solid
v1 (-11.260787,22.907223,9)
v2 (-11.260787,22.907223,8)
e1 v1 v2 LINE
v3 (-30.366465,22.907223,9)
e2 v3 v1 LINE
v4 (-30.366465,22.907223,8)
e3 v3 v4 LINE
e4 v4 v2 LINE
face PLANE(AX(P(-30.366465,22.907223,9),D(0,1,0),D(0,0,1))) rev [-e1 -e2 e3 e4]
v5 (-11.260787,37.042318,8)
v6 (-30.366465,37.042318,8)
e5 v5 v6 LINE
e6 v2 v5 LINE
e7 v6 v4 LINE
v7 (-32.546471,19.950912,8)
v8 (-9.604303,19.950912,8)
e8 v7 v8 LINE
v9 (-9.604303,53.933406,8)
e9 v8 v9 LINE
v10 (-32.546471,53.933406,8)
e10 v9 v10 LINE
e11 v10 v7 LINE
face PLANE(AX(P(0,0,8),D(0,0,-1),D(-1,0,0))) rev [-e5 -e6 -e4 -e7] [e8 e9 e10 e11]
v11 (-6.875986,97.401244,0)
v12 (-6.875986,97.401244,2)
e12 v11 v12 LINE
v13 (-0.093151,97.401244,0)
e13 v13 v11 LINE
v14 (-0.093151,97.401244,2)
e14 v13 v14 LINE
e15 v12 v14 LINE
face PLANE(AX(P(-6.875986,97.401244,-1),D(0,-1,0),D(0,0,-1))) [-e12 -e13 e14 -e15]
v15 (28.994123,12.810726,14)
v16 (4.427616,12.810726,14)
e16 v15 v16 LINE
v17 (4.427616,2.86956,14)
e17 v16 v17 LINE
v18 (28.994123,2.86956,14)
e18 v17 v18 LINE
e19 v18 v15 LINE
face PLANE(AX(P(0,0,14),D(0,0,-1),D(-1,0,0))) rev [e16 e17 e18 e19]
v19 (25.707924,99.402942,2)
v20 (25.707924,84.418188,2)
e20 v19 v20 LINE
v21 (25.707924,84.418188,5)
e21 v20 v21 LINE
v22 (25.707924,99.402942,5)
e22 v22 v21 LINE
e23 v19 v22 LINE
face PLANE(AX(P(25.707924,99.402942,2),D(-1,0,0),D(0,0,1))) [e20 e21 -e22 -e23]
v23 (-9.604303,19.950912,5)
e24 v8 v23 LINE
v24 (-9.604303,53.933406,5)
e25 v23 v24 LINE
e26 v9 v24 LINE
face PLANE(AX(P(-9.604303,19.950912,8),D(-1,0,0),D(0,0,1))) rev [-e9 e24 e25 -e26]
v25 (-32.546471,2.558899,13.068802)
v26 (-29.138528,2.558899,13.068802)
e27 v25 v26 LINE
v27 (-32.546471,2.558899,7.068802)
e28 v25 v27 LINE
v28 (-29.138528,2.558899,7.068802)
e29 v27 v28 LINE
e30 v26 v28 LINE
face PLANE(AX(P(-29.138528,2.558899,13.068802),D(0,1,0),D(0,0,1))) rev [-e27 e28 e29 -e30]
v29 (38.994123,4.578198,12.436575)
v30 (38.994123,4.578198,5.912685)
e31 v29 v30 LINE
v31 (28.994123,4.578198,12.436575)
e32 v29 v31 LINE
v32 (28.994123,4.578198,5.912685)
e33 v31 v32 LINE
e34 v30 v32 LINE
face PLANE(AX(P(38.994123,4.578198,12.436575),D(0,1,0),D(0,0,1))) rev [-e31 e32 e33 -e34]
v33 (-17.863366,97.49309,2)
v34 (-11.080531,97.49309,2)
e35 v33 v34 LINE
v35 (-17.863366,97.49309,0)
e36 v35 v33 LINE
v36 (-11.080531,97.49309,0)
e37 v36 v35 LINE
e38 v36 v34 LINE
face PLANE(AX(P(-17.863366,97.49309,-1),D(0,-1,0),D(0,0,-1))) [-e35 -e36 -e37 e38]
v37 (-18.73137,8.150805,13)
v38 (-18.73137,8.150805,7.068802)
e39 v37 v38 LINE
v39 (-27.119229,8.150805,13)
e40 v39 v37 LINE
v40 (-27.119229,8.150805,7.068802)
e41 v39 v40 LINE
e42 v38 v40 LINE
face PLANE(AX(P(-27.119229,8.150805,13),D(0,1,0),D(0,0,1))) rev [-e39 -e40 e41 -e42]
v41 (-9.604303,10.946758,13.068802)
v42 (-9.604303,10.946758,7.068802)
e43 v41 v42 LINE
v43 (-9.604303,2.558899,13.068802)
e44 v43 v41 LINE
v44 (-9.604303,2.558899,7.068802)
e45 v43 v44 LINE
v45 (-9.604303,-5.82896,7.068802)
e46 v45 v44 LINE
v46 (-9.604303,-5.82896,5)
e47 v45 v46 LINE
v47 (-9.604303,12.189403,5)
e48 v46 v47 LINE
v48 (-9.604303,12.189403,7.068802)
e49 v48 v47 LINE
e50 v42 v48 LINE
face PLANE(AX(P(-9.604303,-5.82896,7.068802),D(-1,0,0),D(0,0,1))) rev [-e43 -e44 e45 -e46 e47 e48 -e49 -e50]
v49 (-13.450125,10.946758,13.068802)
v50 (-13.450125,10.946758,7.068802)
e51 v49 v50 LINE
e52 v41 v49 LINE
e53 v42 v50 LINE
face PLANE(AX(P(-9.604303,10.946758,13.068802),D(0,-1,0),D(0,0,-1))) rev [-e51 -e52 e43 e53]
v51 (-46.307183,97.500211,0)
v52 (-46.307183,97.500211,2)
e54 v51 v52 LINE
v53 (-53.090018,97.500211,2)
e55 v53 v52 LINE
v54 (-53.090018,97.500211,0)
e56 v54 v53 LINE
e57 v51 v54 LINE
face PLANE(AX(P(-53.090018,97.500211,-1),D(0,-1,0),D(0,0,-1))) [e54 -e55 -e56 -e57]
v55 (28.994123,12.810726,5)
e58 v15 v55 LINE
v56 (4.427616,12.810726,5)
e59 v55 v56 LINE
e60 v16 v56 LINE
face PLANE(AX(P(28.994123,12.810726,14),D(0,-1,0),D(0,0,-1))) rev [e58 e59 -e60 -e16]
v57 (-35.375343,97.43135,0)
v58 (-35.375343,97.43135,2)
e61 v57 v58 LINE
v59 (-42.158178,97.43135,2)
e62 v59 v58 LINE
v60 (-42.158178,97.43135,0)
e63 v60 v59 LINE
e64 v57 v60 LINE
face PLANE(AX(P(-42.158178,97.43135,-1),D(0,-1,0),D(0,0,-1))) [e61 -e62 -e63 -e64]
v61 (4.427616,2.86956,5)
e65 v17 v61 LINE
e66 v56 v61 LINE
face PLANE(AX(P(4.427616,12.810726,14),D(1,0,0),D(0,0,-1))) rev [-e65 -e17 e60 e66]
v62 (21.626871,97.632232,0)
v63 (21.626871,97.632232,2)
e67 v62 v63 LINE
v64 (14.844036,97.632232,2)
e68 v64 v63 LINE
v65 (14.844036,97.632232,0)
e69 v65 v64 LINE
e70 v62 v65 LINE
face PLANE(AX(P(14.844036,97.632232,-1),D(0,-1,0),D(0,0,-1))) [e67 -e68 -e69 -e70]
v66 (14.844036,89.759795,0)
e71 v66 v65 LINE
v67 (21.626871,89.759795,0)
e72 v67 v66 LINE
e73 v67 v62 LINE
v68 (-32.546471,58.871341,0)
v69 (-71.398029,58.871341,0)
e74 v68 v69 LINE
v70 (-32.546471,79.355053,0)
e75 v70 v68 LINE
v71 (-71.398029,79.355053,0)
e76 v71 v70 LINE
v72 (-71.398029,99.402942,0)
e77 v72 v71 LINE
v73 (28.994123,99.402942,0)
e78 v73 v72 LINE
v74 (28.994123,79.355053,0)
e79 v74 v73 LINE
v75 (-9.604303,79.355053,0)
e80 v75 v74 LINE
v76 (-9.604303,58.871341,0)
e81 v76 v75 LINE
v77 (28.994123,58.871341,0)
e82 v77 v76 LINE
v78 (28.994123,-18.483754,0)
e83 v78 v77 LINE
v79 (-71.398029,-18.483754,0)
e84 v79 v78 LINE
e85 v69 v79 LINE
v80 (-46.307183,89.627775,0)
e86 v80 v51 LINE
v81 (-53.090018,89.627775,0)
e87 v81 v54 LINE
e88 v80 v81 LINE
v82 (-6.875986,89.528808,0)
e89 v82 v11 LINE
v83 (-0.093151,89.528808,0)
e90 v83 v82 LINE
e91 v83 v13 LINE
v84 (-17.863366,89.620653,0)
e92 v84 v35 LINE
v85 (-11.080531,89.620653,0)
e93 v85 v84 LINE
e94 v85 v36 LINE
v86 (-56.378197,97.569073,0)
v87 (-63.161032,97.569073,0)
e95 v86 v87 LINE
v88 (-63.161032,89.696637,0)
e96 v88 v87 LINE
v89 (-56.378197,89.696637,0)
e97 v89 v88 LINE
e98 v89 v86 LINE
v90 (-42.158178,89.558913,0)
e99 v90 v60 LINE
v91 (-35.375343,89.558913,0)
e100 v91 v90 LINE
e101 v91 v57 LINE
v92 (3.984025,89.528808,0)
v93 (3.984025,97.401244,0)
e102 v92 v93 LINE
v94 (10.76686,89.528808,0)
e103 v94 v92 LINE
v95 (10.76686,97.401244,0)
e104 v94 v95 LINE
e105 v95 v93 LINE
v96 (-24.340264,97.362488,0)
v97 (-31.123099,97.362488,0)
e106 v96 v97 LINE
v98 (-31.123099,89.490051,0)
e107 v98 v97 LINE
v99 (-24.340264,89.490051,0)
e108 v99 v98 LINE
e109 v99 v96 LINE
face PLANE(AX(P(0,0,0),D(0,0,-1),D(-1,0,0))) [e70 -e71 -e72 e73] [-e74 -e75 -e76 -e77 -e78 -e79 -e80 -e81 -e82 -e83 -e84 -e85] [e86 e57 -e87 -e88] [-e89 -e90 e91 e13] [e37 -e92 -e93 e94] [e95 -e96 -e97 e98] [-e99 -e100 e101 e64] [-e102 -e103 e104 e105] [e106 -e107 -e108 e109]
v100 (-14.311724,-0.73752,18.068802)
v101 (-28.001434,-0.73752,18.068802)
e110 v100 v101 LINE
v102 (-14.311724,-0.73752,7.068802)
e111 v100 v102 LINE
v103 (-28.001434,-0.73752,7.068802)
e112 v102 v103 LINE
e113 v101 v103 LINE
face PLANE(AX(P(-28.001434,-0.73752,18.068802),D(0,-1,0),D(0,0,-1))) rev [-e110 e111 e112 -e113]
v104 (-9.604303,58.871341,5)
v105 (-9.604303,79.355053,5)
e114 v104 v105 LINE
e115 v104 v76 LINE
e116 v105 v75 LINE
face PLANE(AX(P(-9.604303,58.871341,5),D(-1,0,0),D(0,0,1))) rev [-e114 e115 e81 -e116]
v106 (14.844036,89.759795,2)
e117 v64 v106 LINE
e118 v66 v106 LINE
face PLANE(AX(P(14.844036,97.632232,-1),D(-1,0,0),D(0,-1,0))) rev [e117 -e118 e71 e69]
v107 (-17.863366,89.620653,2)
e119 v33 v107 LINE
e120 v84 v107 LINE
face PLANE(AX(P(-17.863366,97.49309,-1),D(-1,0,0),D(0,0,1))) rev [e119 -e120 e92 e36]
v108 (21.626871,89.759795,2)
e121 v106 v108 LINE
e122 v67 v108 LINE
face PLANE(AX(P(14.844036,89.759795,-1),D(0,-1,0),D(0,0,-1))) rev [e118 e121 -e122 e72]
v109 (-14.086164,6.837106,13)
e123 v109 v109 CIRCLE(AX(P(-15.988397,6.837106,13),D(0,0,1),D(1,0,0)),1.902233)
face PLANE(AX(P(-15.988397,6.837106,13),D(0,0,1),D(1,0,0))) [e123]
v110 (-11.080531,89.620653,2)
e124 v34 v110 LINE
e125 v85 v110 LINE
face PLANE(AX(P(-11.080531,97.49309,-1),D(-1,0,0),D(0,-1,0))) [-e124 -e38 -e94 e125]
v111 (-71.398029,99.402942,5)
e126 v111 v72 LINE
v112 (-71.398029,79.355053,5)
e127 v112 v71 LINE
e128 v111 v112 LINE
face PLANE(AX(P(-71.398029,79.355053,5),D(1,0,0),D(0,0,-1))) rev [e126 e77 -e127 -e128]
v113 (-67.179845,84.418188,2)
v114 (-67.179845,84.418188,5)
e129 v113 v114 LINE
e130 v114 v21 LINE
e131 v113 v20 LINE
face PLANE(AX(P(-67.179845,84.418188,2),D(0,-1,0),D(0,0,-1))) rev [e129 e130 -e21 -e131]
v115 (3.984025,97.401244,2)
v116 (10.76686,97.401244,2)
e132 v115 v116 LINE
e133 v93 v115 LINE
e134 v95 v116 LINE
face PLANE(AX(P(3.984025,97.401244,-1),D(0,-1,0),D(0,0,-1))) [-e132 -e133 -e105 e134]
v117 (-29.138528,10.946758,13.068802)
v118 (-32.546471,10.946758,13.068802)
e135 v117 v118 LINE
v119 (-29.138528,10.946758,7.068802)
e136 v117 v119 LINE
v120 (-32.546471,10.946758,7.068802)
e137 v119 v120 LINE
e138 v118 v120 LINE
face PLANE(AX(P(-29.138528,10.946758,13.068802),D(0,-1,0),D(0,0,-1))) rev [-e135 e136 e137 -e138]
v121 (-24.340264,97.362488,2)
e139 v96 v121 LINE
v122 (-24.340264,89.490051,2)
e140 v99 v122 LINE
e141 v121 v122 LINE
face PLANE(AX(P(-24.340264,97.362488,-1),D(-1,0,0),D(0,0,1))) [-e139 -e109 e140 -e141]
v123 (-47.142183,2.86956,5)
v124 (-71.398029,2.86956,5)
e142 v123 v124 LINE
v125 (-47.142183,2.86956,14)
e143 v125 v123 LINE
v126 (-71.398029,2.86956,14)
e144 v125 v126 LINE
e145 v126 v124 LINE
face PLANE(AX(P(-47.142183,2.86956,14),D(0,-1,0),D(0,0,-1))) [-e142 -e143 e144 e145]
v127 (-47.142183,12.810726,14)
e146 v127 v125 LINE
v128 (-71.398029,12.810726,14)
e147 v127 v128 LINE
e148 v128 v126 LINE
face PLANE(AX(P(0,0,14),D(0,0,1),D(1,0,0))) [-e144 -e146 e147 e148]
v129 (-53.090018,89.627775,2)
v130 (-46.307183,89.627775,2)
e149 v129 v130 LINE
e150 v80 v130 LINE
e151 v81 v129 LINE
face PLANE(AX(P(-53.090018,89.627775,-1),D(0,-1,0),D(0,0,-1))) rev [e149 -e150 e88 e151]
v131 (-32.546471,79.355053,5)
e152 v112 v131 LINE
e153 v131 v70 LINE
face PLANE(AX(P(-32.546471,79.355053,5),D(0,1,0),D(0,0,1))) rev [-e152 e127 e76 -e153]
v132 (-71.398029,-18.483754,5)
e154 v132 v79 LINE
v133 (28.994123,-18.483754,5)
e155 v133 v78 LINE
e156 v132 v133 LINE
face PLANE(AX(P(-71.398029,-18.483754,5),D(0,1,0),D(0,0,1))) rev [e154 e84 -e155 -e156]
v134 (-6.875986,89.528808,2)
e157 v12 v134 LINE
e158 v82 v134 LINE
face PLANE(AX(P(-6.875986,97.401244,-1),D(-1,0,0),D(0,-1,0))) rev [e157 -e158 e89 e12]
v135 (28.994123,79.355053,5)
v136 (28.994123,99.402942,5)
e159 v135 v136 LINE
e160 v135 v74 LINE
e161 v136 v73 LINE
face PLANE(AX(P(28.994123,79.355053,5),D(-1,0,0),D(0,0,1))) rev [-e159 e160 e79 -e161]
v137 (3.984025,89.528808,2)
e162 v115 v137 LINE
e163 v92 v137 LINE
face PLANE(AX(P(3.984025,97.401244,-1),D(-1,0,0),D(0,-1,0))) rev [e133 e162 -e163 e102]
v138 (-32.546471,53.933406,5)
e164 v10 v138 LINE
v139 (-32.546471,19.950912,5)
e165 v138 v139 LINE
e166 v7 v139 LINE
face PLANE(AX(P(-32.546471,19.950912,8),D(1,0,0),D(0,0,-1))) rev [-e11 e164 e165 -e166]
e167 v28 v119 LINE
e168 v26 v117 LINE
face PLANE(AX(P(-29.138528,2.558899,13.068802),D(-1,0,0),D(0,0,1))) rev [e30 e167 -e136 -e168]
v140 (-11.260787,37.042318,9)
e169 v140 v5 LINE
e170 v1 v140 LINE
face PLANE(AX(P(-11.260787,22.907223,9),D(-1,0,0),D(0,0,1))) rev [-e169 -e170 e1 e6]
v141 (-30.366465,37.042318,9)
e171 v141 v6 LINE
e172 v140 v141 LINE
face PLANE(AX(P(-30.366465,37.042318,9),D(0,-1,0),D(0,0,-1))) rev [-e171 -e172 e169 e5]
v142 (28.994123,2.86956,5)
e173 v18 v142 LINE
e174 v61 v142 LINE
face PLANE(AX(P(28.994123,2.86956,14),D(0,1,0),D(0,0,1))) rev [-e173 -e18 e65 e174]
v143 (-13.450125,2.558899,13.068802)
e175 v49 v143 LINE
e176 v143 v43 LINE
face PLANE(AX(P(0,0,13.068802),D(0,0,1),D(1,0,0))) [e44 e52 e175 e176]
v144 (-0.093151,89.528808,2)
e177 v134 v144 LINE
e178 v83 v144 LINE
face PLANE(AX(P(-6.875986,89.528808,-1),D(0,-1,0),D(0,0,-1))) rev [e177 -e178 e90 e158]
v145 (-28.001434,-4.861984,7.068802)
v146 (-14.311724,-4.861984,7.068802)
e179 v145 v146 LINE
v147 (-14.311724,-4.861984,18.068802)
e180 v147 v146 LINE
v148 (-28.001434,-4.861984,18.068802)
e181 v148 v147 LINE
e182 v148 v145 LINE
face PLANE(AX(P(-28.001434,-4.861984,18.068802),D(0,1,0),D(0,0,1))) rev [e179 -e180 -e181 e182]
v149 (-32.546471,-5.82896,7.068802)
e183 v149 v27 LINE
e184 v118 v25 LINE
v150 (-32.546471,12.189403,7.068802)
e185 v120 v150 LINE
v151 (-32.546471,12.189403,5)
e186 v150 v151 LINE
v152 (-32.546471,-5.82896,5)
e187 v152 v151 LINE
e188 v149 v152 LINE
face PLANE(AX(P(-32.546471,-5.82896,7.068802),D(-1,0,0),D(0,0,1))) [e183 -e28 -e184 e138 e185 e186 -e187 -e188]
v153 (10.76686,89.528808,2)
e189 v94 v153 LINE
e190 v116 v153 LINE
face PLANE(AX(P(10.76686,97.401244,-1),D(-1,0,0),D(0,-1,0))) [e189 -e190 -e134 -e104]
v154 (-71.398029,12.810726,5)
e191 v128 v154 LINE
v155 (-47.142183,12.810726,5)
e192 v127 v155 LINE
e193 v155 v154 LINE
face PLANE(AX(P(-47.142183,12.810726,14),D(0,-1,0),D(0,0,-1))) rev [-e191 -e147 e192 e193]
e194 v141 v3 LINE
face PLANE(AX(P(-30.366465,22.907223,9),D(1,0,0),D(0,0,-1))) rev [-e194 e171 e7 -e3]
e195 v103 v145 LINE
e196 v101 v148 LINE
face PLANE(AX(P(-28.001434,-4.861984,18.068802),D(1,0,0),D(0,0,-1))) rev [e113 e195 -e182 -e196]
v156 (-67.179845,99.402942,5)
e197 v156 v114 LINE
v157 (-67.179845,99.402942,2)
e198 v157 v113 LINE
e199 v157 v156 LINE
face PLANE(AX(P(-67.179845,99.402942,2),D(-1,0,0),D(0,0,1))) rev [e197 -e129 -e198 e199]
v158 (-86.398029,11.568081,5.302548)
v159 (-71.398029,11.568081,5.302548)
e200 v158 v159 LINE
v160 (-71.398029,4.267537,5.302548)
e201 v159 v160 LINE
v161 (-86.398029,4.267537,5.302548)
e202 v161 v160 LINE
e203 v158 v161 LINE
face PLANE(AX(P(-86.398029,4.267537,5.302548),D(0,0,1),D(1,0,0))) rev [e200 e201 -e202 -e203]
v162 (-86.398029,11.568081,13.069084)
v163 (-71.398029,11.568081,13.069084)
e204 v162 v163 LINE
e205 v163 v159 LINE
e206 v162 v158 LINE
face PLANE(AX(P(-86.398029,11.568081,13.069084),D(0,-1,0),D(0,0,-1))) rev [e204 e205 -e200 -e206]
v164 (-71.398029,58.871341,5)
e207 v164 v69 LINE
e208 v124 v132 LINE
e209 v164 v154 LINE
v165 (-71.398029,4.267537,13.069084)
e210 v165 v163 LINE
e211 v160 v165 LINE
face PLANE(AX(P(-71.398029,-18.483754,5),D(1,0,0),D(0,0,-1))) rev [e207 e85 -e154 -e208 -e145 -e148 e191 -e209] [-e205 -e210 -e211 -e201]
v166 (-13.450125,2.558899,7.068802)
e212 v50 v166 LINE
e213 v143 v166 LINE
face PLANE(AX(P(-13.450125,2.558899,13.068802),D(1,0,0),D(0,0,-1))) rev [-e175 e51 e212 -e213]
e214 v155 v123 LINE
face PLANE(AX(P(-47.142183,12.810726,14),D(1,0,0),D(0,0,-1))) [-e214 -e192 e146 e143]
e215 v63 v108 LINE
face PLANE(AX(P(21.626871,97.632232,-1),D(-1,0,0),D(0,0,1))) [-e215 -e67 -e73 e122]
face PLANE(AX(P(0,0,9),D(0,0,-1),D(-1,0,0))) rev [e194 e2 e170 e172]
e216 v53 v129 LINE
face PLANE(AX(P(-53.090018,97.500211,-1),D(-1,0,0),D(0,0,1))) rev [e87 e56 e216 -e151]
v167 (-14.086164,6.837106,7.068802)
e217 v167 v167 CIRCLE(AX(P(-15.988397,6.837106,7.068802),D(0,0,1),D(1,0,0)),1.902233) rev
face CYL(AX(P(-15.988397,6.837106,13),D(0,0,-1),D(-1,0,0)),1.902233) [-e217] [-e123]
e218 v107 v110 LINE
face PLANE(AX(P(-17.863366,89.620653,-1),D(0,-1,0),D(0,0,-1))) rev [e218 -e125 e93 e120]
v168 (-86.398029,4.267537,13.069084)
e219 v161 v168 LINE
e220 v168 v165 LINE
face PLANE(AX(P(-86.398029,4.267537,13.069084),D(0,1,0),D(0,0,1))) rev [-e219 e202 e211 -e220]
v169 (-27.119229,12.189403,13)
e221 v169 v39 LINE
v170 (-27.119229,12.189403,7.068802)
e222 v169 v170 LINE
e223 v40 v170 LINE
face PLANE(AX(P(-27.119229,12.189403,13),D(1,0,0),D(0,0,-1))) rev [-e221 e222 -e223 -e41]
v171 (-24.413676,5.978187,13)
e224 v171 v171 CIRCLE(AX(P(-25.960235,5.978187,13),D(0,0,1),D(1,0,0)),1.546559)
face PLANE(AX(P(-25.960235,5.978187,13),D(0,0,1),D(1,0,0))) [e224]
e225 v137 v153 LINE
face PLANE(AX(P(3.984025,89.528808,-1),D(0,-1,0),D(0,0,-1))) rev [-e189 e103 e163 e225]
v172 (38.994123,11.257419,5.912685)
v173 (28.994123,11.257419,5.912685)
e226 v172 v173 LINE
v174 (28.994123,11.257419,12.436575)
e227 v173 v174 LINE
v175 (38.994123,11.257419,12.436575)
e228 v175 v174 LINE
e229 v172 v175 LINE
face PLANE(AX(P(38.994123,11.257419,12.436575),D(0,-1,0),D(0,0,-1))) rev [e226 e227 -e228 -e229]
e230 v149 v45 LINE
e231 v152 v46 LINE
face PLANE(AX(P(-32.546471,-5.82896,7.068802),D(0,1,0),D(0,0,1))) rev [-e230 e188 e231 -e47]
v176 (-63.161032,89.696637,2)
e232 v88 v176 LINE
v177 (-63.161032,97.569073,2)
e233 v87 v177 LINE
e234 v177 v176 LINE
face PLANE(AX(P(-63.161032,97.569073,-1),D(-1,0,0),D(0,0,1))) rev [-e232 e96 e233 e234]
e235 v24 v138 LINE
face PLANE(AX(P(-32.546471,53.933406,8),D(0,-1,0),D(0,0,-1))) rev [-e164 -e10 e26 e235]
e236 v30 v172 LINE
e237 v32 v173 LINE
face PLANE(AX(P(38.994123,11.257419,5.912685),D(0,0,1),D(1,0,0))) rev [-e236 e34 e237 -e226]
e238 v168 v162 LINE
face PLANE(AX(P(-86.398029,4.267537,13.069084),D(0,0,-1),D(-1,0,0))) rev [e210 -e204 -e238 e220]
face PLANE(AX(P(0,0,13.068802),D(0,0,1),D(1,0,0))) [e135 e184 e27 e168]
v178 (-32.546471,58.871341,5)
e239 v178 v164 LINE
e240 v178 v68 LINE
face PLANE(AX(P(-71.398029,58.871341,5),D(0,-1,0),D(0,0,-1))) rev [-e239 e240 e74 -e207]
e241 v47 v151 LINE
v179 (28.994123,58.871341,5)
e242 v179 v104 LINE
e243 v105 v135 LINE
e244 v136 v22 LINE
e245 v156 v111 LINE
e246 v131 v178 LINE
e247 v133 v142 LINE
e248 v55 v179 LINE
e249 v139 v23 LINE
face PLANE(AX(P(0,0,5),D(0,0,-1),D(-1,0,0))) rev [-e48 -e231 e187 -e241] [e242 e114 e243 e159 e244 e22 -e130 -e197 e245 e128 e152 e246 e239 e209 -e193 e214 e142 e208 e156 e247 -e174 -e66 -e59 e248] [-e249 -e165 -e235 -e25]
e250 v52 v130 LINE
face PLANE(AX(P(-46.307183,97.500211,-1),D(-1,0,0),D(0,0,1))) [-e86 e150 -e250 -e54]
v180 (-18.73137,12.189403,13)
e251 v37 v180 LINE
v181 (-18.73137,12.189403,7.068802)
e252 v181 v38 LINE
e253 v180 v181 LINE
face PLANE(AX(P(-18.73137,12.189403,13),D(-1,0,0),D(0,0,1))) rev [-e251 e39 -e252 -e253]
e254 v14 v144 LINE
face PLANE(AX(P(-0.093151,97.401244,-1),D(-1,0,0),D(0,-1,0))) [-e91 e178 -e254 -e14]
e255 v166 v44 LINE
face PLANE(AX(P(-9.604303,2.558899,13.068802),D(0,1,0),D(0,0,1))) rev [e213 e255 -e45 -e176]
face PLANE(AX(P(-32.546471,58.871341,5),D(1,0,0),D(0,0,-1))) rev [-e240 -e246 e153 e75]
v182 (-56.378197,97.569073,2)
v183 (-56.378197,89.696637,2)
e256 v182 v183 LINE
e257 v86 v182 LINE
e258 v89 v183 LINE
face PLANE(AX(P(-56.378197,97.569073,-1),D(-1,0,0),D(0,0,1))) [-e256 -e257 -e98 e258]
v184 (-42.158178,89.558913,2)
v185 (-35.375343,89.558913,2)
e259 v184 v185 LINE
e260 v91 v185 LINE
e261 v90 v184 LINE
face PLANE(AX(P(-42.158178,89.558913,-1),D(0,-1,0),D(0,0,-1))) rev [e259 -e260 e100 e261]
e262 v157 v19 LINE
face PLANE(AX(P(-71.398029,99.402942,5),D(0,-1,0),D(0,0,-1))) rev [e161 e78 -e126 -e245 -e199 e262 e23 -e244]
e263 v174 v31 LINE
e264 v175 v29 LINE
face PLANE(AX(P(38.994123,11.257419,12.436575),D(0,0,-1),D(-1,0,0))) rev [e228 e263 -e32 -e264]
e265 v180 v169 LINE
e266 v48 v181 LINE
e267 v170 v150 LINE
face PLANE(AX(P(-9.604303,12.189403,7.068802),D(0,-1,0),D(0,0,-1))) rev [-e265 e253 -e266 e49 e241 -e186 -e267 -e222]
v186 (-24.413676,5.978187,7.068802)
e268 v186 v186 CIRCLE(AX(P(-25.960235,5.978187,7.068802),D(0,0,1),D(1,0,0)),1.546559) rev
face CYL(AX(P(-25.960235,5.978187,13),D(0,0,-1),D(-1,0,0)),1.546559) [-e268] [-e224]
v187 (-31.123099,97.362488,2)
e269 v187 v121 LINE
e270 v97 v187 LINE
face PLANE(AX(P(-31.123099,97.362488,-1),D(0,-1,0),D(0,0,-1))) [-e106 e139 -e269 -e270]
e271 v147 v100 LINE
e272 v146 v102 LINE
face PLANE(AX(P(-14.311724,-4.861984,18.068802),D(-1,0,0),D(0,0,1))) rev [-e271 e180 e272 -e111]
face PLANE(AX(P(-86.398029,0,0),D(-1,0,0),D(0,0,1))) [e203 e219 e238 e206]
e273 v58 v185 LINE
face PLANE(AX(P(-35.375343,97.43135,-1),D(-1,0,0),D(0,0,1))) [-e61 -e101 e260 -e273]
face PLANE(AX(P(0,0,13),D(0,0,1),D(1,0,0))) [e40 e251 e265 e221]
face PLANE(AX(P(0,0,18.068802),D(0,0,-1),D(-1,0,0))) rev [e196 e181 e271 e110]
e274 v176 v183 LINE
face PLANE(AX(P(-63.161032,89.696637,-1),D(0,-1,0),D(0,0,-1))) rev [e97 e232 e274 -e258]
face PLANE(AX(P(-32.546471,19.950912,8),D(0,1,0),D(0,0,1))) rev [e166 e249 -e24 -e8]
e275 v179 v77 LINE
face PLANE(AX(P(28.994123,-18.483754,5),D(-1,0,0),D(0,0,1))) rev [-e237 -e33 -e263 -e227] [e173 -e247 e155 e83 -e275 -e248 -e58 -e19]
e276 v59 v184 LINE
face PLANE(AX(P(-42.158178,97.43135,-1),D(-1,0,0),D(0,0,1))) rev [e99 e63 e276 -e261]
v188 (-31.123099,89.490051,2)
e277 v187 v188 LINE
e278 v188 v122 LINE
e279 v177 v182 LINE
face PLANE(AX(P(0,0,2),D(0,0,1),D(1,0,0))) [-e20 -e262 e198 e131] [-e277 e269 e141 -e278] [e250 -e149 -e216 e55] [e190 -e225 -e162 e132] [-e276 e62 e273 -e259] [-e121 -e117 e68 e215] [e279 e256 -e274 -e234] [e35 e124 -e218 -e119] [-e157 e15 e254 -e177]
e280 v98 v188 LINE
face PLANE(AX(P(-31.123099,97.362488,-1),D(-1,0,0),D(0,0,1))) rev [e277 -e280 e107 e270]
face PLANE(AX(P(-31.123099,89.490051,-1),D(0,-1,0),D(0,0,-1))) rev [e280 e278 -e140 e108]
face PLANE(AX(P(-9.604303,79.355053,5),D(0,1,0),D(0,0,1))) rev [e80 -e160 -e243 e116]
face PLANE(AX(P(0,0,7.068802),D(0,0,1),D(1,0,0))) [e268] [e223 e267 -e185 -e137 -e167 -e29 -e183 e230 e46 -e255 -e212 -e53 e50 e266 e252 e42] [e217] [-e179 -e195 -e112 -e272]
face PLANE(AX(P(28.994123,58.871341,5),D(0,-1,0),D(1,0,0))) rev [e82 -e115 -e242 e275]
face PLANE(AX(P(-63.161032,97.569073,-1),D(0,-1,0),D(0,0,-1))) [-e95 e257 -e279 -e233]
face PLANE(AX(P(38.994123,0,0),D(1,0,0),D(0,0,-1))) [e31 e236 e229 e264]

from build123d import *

# Parameters (mm, degrees)
RESSALTO_EXTRUS_O1_DEPTH      = 5
ESBO_O4_W                     = 92.887769858
ESBO_O4_H                     = 14.984754445
CORTE_EXTRUS_O1_DEPTH         = 3
RESSALTO_EXTRUS_O12_OUTLINE_W = 22.942167962
RESSALTO_EXTRUS_O12_OUTLINE_H = 18.018363384
RESSALTO_EXTRUS_O12_DEPTH     = 2.068801543
ESBO_O10_W                    = 24.255846062
ESBO_O10_H                    = 9.941166005
RESSALTO_EXTRUS_O2_DEPTH      = 9
ESBO_O12_W                    = 24.5665075
ESBO_O12_H                    = 9.941166005
RESSALTO_EXTRUS_O3_DEPTH      = 9
ESBO_O13_W                    = 22.942167962
ESBO_O13_H                    = 33.982493236
RESSALTO_EXTRUS_O4_DEPTH      = 3
ESBO_O14_W                    = 6.782835172
ESBO_O14_H                    = 7.872436605
ESBO_O14_W_2                  = 6.782835171
ESBO_O14_H_2                  = 7.872436606
CORTE_EXTRUS_O4_DEPTH         = 3
ESBO_O15_W                    = 19.105678415
ESBO_O15_H                    = 14.135095414
RESSALTO_EXTRUS_O5_DEPTH      = 1
ESBO_O18_W                    = 6.523890191
ESBO_O18_H                    = 6.679220909
RESSALTO_EXTRUS_O9_DEPTH      = 10
ESBO_O19_W                    = 7.766535942
ESBO_O19_H                    = 7.300543785
RESSALTO_EXTRUS_O10_DEPTH     = 15
ESBO_O21_W                    = 13.689709829
ESBO_O21_H                    = 4.124463858
RESSALTO_EXTRUS_O13_DEPTH     = 11
ESBO_O22_W                    = 3.40794345
ESBO_O22_H                    = 8.387858817
ESBO_O22_W_2                  = 3.845821911
RESSALTO_EXTRUS_O14_DEPTH     = 6
ESBO_O23_R                    = 1.902232627
ESBO_O23_R_2                  = 1.546559196
ESBO_O23_W                    = 8.387858817
ESBO_O23_H                    = 4.038598689
RESSALTO_EXTRUS_O15_DEPTH     = 8


# Read off the part's stored shape, not the designer's step: Ressalto-extrusão12
with BuildPart() as part:
    # Esboço2 → Ressalto-extrusão1 (new body)
    with BuildSketch(Plane.XY):
        Polygon((-71.39802883, 58.87134079), (-32.546471332, 58.87134079), (-32.546471332, 79.355053275), (-71.39802883, 79.355053275), (-71.39802883, 99.40294209), (28.994123383, 99.40294209), (28.994123383, 79.355053275), (-9.60430337, 79.355053275), (-9.60430337, 58.87134079), (28.994123383, 58.87134079), (28.994123383, -18.483753656), (-71.39802883, -18.483753656), align=None)
    extrude(amount=RESSALTO_EXTRUS_O1_DEPTH)

    # Esboço4 → Corte-extrusão1 (cut)
    with BuildSketch(Plane.XY.offset(5)):
        with Locations((-20.735960567, 91.910564867)):
            Rectangle(ESBO_O4_W, ESBO_O4_H)
    extrude(amount=-CORTE_EXTRUS_O1_DEPTH, mode=Mode.SUBTRACT)

    # Ressalto-extrusão12 outline → Ressalto-extrusão12 (add)
    with BuildSketch(Plane.XY.offset(5)):
        with Locations((-21.075387351, 3.180221698)):
            Rectangle(RESSALTO_EXTRUS_O12_OUTLINE_W, RESSALTO_EXTRUS_O12_OUTLINE_H)
    extrude(amount=RESSALTO_EXTRUS_O12_DEPTH)

    # Esboço10 → Ressalto-extrusão2 (add)
    with BuildSketch(Plane.XY.offset(5)):
        with Locations((-59.270105799, 7.840143264)):
            Rectangle(ESBO_O10_W, ESBO_O10_H)
    extrude(amount=RESSALTO_EXTRUS_O2_DEPTH)

    # Esboço12 → Ressalto-extrusão3 (add)
    with BuildSketch(Plane.XY.offset(5)):
        with Locations((16.710869633, 7.840143264)):
            Rectangle(ESBO_O12_W, ESBO_O12_H)
    extrude(amount=RESSALTO_EXTRUS_O3_DEPTH)

    # Esboço13 → Ressalto-extrusão4 (add)
    with BuildSketch(Plane.XY.offset(5)):
        with Locations((-21.075387351, 36.942158983)):
            Rectangle(ESBO_O13_W, ESBO_O13_H)
    extrude(amount=RESSALTO_EXTRUS_O4_DEPTH)

    # Esboço14 → Corte-extrusão4 (cut)
    with BuildSketch(Plane.XY.offset(2)):
        with Locations((-49.698600708, 93.563993113)):
            Rectangle(ESBO_O14_W, ESBO_O14_H)
        with Locations((-14.471948292, 93.556871263)):
            Rectangle(ESBO_O14_W, ESBO_O14_H)
        with Locations((-38.766760461, 93.495131296)):
            Rectangle(ESBO_O14_W_2, ESBO_O14_H_2)
        with Locations((-27.731681244, 93.42626948)):
            Rectangle(ESBO_O14_W, ESBO_O14_H)
        with Locations((-59.769614495, 93.632854929)):
            Rectangle(ESBO_O14_W_2, ESBO_O14_H_2)
        with Locations((-3.484568548, 93.465026179)):
            Rectangle(ESBO_O14_W, ESBO_O14_H_2)
        with Locations((7.375442348, 93.465026179)):
            Rectangle(ESBO_O14_W, ESBO_O14_H_2)
        with Locations((18.235453244, 93.696013601)):
            Rectangle(ESBO_O14_W, ESBO_O14_H_2)
    extrude(amount=-CORTE_EXTRUS_O4_DEPTH, mode=Mode.SUBTRACT)

    # Esboço15 → Ressalto-extrusão5 (add)
    with BuildSketch(Plane.XY.offset(8)):
        with Locations((-20.813625927, 29.974770696)):
            Rectangle(ESBO_O15_W, ESBO_O15_H)
    extrude(amount=RESSALTO_EXTRUS_O5_DEPTH)

    # Esboço18 → Ressalto-extrusão9 (add)
    with BuildSketch(Plane(origin=(28.994123383, 0, 0), x_dir=(0, 0, -1), z_dir=(1, 0, 0))):
        with Locations((-9.174630064, 7.917808623)):
            Rectangle(ESBO_O18_W, ESBO_O18_H)
    extrude(amount=RESSALTO_EXTRUS_O9_DEPTH)

    # Esboço19 → Ressalto-extrusão10 (add)
    with BuildSketch(Plane.ZY.offset(71.39802883)):
        with Locations((9.185815902, 7.917808623)):
            Rectangle(ESBO_O19_W, ESBO_O19_H)
    extrude(amount=RESSALTO_EXTRUS_O10_DEPTH)

    # Esboço21 → Ressalto-extrusão13 (add)
    with BuildSketch(Plane.XY.offset(7.068801543)):
        with Locations((-21.156578629, -2.799751995)):
            Rectangle(ESBO_O21_W, ESBO_O21_H)
    extrude(amount=RESSALTO_EXTRUS_O13_DEPTH)

    # Esboço22 → Ressalto-extrusão14 (add)
    with BuildSketch(Plane.XY.offset(7.068801543)):
        with Locations((-30.842499607, 6.752828232)):
            Rectangle(ESBO_O22_W, ESBO_O22_H)
        with Locations((-11.527214326, 6.752828232)):
            Rectangle(ESBO_O22_W_2, ESBO_O22_H)
    extrude(amount=RESSALTO_EXTRUS_O14_DEPTH)

    # Esboço23 → Ressalto-extrusão15 (add)
    with BuildSketch(Plane.XY.offset(5)):
        with Locations((-15.988396591, 6.837106018)):
            Circle(ESBO_O23_R)
        with Locations((-25.960235387, 5.97818713)):
            Circle(ESBO_O23_R_2)
        with Locations((-22.92529913, 10.170104046)):
            Rectangle(ESBO_O23_W, ESBO_O23_H)
    extrude(amount=RESSALTO_EXTRUS_O15_DEPTH)


solid = part.part
